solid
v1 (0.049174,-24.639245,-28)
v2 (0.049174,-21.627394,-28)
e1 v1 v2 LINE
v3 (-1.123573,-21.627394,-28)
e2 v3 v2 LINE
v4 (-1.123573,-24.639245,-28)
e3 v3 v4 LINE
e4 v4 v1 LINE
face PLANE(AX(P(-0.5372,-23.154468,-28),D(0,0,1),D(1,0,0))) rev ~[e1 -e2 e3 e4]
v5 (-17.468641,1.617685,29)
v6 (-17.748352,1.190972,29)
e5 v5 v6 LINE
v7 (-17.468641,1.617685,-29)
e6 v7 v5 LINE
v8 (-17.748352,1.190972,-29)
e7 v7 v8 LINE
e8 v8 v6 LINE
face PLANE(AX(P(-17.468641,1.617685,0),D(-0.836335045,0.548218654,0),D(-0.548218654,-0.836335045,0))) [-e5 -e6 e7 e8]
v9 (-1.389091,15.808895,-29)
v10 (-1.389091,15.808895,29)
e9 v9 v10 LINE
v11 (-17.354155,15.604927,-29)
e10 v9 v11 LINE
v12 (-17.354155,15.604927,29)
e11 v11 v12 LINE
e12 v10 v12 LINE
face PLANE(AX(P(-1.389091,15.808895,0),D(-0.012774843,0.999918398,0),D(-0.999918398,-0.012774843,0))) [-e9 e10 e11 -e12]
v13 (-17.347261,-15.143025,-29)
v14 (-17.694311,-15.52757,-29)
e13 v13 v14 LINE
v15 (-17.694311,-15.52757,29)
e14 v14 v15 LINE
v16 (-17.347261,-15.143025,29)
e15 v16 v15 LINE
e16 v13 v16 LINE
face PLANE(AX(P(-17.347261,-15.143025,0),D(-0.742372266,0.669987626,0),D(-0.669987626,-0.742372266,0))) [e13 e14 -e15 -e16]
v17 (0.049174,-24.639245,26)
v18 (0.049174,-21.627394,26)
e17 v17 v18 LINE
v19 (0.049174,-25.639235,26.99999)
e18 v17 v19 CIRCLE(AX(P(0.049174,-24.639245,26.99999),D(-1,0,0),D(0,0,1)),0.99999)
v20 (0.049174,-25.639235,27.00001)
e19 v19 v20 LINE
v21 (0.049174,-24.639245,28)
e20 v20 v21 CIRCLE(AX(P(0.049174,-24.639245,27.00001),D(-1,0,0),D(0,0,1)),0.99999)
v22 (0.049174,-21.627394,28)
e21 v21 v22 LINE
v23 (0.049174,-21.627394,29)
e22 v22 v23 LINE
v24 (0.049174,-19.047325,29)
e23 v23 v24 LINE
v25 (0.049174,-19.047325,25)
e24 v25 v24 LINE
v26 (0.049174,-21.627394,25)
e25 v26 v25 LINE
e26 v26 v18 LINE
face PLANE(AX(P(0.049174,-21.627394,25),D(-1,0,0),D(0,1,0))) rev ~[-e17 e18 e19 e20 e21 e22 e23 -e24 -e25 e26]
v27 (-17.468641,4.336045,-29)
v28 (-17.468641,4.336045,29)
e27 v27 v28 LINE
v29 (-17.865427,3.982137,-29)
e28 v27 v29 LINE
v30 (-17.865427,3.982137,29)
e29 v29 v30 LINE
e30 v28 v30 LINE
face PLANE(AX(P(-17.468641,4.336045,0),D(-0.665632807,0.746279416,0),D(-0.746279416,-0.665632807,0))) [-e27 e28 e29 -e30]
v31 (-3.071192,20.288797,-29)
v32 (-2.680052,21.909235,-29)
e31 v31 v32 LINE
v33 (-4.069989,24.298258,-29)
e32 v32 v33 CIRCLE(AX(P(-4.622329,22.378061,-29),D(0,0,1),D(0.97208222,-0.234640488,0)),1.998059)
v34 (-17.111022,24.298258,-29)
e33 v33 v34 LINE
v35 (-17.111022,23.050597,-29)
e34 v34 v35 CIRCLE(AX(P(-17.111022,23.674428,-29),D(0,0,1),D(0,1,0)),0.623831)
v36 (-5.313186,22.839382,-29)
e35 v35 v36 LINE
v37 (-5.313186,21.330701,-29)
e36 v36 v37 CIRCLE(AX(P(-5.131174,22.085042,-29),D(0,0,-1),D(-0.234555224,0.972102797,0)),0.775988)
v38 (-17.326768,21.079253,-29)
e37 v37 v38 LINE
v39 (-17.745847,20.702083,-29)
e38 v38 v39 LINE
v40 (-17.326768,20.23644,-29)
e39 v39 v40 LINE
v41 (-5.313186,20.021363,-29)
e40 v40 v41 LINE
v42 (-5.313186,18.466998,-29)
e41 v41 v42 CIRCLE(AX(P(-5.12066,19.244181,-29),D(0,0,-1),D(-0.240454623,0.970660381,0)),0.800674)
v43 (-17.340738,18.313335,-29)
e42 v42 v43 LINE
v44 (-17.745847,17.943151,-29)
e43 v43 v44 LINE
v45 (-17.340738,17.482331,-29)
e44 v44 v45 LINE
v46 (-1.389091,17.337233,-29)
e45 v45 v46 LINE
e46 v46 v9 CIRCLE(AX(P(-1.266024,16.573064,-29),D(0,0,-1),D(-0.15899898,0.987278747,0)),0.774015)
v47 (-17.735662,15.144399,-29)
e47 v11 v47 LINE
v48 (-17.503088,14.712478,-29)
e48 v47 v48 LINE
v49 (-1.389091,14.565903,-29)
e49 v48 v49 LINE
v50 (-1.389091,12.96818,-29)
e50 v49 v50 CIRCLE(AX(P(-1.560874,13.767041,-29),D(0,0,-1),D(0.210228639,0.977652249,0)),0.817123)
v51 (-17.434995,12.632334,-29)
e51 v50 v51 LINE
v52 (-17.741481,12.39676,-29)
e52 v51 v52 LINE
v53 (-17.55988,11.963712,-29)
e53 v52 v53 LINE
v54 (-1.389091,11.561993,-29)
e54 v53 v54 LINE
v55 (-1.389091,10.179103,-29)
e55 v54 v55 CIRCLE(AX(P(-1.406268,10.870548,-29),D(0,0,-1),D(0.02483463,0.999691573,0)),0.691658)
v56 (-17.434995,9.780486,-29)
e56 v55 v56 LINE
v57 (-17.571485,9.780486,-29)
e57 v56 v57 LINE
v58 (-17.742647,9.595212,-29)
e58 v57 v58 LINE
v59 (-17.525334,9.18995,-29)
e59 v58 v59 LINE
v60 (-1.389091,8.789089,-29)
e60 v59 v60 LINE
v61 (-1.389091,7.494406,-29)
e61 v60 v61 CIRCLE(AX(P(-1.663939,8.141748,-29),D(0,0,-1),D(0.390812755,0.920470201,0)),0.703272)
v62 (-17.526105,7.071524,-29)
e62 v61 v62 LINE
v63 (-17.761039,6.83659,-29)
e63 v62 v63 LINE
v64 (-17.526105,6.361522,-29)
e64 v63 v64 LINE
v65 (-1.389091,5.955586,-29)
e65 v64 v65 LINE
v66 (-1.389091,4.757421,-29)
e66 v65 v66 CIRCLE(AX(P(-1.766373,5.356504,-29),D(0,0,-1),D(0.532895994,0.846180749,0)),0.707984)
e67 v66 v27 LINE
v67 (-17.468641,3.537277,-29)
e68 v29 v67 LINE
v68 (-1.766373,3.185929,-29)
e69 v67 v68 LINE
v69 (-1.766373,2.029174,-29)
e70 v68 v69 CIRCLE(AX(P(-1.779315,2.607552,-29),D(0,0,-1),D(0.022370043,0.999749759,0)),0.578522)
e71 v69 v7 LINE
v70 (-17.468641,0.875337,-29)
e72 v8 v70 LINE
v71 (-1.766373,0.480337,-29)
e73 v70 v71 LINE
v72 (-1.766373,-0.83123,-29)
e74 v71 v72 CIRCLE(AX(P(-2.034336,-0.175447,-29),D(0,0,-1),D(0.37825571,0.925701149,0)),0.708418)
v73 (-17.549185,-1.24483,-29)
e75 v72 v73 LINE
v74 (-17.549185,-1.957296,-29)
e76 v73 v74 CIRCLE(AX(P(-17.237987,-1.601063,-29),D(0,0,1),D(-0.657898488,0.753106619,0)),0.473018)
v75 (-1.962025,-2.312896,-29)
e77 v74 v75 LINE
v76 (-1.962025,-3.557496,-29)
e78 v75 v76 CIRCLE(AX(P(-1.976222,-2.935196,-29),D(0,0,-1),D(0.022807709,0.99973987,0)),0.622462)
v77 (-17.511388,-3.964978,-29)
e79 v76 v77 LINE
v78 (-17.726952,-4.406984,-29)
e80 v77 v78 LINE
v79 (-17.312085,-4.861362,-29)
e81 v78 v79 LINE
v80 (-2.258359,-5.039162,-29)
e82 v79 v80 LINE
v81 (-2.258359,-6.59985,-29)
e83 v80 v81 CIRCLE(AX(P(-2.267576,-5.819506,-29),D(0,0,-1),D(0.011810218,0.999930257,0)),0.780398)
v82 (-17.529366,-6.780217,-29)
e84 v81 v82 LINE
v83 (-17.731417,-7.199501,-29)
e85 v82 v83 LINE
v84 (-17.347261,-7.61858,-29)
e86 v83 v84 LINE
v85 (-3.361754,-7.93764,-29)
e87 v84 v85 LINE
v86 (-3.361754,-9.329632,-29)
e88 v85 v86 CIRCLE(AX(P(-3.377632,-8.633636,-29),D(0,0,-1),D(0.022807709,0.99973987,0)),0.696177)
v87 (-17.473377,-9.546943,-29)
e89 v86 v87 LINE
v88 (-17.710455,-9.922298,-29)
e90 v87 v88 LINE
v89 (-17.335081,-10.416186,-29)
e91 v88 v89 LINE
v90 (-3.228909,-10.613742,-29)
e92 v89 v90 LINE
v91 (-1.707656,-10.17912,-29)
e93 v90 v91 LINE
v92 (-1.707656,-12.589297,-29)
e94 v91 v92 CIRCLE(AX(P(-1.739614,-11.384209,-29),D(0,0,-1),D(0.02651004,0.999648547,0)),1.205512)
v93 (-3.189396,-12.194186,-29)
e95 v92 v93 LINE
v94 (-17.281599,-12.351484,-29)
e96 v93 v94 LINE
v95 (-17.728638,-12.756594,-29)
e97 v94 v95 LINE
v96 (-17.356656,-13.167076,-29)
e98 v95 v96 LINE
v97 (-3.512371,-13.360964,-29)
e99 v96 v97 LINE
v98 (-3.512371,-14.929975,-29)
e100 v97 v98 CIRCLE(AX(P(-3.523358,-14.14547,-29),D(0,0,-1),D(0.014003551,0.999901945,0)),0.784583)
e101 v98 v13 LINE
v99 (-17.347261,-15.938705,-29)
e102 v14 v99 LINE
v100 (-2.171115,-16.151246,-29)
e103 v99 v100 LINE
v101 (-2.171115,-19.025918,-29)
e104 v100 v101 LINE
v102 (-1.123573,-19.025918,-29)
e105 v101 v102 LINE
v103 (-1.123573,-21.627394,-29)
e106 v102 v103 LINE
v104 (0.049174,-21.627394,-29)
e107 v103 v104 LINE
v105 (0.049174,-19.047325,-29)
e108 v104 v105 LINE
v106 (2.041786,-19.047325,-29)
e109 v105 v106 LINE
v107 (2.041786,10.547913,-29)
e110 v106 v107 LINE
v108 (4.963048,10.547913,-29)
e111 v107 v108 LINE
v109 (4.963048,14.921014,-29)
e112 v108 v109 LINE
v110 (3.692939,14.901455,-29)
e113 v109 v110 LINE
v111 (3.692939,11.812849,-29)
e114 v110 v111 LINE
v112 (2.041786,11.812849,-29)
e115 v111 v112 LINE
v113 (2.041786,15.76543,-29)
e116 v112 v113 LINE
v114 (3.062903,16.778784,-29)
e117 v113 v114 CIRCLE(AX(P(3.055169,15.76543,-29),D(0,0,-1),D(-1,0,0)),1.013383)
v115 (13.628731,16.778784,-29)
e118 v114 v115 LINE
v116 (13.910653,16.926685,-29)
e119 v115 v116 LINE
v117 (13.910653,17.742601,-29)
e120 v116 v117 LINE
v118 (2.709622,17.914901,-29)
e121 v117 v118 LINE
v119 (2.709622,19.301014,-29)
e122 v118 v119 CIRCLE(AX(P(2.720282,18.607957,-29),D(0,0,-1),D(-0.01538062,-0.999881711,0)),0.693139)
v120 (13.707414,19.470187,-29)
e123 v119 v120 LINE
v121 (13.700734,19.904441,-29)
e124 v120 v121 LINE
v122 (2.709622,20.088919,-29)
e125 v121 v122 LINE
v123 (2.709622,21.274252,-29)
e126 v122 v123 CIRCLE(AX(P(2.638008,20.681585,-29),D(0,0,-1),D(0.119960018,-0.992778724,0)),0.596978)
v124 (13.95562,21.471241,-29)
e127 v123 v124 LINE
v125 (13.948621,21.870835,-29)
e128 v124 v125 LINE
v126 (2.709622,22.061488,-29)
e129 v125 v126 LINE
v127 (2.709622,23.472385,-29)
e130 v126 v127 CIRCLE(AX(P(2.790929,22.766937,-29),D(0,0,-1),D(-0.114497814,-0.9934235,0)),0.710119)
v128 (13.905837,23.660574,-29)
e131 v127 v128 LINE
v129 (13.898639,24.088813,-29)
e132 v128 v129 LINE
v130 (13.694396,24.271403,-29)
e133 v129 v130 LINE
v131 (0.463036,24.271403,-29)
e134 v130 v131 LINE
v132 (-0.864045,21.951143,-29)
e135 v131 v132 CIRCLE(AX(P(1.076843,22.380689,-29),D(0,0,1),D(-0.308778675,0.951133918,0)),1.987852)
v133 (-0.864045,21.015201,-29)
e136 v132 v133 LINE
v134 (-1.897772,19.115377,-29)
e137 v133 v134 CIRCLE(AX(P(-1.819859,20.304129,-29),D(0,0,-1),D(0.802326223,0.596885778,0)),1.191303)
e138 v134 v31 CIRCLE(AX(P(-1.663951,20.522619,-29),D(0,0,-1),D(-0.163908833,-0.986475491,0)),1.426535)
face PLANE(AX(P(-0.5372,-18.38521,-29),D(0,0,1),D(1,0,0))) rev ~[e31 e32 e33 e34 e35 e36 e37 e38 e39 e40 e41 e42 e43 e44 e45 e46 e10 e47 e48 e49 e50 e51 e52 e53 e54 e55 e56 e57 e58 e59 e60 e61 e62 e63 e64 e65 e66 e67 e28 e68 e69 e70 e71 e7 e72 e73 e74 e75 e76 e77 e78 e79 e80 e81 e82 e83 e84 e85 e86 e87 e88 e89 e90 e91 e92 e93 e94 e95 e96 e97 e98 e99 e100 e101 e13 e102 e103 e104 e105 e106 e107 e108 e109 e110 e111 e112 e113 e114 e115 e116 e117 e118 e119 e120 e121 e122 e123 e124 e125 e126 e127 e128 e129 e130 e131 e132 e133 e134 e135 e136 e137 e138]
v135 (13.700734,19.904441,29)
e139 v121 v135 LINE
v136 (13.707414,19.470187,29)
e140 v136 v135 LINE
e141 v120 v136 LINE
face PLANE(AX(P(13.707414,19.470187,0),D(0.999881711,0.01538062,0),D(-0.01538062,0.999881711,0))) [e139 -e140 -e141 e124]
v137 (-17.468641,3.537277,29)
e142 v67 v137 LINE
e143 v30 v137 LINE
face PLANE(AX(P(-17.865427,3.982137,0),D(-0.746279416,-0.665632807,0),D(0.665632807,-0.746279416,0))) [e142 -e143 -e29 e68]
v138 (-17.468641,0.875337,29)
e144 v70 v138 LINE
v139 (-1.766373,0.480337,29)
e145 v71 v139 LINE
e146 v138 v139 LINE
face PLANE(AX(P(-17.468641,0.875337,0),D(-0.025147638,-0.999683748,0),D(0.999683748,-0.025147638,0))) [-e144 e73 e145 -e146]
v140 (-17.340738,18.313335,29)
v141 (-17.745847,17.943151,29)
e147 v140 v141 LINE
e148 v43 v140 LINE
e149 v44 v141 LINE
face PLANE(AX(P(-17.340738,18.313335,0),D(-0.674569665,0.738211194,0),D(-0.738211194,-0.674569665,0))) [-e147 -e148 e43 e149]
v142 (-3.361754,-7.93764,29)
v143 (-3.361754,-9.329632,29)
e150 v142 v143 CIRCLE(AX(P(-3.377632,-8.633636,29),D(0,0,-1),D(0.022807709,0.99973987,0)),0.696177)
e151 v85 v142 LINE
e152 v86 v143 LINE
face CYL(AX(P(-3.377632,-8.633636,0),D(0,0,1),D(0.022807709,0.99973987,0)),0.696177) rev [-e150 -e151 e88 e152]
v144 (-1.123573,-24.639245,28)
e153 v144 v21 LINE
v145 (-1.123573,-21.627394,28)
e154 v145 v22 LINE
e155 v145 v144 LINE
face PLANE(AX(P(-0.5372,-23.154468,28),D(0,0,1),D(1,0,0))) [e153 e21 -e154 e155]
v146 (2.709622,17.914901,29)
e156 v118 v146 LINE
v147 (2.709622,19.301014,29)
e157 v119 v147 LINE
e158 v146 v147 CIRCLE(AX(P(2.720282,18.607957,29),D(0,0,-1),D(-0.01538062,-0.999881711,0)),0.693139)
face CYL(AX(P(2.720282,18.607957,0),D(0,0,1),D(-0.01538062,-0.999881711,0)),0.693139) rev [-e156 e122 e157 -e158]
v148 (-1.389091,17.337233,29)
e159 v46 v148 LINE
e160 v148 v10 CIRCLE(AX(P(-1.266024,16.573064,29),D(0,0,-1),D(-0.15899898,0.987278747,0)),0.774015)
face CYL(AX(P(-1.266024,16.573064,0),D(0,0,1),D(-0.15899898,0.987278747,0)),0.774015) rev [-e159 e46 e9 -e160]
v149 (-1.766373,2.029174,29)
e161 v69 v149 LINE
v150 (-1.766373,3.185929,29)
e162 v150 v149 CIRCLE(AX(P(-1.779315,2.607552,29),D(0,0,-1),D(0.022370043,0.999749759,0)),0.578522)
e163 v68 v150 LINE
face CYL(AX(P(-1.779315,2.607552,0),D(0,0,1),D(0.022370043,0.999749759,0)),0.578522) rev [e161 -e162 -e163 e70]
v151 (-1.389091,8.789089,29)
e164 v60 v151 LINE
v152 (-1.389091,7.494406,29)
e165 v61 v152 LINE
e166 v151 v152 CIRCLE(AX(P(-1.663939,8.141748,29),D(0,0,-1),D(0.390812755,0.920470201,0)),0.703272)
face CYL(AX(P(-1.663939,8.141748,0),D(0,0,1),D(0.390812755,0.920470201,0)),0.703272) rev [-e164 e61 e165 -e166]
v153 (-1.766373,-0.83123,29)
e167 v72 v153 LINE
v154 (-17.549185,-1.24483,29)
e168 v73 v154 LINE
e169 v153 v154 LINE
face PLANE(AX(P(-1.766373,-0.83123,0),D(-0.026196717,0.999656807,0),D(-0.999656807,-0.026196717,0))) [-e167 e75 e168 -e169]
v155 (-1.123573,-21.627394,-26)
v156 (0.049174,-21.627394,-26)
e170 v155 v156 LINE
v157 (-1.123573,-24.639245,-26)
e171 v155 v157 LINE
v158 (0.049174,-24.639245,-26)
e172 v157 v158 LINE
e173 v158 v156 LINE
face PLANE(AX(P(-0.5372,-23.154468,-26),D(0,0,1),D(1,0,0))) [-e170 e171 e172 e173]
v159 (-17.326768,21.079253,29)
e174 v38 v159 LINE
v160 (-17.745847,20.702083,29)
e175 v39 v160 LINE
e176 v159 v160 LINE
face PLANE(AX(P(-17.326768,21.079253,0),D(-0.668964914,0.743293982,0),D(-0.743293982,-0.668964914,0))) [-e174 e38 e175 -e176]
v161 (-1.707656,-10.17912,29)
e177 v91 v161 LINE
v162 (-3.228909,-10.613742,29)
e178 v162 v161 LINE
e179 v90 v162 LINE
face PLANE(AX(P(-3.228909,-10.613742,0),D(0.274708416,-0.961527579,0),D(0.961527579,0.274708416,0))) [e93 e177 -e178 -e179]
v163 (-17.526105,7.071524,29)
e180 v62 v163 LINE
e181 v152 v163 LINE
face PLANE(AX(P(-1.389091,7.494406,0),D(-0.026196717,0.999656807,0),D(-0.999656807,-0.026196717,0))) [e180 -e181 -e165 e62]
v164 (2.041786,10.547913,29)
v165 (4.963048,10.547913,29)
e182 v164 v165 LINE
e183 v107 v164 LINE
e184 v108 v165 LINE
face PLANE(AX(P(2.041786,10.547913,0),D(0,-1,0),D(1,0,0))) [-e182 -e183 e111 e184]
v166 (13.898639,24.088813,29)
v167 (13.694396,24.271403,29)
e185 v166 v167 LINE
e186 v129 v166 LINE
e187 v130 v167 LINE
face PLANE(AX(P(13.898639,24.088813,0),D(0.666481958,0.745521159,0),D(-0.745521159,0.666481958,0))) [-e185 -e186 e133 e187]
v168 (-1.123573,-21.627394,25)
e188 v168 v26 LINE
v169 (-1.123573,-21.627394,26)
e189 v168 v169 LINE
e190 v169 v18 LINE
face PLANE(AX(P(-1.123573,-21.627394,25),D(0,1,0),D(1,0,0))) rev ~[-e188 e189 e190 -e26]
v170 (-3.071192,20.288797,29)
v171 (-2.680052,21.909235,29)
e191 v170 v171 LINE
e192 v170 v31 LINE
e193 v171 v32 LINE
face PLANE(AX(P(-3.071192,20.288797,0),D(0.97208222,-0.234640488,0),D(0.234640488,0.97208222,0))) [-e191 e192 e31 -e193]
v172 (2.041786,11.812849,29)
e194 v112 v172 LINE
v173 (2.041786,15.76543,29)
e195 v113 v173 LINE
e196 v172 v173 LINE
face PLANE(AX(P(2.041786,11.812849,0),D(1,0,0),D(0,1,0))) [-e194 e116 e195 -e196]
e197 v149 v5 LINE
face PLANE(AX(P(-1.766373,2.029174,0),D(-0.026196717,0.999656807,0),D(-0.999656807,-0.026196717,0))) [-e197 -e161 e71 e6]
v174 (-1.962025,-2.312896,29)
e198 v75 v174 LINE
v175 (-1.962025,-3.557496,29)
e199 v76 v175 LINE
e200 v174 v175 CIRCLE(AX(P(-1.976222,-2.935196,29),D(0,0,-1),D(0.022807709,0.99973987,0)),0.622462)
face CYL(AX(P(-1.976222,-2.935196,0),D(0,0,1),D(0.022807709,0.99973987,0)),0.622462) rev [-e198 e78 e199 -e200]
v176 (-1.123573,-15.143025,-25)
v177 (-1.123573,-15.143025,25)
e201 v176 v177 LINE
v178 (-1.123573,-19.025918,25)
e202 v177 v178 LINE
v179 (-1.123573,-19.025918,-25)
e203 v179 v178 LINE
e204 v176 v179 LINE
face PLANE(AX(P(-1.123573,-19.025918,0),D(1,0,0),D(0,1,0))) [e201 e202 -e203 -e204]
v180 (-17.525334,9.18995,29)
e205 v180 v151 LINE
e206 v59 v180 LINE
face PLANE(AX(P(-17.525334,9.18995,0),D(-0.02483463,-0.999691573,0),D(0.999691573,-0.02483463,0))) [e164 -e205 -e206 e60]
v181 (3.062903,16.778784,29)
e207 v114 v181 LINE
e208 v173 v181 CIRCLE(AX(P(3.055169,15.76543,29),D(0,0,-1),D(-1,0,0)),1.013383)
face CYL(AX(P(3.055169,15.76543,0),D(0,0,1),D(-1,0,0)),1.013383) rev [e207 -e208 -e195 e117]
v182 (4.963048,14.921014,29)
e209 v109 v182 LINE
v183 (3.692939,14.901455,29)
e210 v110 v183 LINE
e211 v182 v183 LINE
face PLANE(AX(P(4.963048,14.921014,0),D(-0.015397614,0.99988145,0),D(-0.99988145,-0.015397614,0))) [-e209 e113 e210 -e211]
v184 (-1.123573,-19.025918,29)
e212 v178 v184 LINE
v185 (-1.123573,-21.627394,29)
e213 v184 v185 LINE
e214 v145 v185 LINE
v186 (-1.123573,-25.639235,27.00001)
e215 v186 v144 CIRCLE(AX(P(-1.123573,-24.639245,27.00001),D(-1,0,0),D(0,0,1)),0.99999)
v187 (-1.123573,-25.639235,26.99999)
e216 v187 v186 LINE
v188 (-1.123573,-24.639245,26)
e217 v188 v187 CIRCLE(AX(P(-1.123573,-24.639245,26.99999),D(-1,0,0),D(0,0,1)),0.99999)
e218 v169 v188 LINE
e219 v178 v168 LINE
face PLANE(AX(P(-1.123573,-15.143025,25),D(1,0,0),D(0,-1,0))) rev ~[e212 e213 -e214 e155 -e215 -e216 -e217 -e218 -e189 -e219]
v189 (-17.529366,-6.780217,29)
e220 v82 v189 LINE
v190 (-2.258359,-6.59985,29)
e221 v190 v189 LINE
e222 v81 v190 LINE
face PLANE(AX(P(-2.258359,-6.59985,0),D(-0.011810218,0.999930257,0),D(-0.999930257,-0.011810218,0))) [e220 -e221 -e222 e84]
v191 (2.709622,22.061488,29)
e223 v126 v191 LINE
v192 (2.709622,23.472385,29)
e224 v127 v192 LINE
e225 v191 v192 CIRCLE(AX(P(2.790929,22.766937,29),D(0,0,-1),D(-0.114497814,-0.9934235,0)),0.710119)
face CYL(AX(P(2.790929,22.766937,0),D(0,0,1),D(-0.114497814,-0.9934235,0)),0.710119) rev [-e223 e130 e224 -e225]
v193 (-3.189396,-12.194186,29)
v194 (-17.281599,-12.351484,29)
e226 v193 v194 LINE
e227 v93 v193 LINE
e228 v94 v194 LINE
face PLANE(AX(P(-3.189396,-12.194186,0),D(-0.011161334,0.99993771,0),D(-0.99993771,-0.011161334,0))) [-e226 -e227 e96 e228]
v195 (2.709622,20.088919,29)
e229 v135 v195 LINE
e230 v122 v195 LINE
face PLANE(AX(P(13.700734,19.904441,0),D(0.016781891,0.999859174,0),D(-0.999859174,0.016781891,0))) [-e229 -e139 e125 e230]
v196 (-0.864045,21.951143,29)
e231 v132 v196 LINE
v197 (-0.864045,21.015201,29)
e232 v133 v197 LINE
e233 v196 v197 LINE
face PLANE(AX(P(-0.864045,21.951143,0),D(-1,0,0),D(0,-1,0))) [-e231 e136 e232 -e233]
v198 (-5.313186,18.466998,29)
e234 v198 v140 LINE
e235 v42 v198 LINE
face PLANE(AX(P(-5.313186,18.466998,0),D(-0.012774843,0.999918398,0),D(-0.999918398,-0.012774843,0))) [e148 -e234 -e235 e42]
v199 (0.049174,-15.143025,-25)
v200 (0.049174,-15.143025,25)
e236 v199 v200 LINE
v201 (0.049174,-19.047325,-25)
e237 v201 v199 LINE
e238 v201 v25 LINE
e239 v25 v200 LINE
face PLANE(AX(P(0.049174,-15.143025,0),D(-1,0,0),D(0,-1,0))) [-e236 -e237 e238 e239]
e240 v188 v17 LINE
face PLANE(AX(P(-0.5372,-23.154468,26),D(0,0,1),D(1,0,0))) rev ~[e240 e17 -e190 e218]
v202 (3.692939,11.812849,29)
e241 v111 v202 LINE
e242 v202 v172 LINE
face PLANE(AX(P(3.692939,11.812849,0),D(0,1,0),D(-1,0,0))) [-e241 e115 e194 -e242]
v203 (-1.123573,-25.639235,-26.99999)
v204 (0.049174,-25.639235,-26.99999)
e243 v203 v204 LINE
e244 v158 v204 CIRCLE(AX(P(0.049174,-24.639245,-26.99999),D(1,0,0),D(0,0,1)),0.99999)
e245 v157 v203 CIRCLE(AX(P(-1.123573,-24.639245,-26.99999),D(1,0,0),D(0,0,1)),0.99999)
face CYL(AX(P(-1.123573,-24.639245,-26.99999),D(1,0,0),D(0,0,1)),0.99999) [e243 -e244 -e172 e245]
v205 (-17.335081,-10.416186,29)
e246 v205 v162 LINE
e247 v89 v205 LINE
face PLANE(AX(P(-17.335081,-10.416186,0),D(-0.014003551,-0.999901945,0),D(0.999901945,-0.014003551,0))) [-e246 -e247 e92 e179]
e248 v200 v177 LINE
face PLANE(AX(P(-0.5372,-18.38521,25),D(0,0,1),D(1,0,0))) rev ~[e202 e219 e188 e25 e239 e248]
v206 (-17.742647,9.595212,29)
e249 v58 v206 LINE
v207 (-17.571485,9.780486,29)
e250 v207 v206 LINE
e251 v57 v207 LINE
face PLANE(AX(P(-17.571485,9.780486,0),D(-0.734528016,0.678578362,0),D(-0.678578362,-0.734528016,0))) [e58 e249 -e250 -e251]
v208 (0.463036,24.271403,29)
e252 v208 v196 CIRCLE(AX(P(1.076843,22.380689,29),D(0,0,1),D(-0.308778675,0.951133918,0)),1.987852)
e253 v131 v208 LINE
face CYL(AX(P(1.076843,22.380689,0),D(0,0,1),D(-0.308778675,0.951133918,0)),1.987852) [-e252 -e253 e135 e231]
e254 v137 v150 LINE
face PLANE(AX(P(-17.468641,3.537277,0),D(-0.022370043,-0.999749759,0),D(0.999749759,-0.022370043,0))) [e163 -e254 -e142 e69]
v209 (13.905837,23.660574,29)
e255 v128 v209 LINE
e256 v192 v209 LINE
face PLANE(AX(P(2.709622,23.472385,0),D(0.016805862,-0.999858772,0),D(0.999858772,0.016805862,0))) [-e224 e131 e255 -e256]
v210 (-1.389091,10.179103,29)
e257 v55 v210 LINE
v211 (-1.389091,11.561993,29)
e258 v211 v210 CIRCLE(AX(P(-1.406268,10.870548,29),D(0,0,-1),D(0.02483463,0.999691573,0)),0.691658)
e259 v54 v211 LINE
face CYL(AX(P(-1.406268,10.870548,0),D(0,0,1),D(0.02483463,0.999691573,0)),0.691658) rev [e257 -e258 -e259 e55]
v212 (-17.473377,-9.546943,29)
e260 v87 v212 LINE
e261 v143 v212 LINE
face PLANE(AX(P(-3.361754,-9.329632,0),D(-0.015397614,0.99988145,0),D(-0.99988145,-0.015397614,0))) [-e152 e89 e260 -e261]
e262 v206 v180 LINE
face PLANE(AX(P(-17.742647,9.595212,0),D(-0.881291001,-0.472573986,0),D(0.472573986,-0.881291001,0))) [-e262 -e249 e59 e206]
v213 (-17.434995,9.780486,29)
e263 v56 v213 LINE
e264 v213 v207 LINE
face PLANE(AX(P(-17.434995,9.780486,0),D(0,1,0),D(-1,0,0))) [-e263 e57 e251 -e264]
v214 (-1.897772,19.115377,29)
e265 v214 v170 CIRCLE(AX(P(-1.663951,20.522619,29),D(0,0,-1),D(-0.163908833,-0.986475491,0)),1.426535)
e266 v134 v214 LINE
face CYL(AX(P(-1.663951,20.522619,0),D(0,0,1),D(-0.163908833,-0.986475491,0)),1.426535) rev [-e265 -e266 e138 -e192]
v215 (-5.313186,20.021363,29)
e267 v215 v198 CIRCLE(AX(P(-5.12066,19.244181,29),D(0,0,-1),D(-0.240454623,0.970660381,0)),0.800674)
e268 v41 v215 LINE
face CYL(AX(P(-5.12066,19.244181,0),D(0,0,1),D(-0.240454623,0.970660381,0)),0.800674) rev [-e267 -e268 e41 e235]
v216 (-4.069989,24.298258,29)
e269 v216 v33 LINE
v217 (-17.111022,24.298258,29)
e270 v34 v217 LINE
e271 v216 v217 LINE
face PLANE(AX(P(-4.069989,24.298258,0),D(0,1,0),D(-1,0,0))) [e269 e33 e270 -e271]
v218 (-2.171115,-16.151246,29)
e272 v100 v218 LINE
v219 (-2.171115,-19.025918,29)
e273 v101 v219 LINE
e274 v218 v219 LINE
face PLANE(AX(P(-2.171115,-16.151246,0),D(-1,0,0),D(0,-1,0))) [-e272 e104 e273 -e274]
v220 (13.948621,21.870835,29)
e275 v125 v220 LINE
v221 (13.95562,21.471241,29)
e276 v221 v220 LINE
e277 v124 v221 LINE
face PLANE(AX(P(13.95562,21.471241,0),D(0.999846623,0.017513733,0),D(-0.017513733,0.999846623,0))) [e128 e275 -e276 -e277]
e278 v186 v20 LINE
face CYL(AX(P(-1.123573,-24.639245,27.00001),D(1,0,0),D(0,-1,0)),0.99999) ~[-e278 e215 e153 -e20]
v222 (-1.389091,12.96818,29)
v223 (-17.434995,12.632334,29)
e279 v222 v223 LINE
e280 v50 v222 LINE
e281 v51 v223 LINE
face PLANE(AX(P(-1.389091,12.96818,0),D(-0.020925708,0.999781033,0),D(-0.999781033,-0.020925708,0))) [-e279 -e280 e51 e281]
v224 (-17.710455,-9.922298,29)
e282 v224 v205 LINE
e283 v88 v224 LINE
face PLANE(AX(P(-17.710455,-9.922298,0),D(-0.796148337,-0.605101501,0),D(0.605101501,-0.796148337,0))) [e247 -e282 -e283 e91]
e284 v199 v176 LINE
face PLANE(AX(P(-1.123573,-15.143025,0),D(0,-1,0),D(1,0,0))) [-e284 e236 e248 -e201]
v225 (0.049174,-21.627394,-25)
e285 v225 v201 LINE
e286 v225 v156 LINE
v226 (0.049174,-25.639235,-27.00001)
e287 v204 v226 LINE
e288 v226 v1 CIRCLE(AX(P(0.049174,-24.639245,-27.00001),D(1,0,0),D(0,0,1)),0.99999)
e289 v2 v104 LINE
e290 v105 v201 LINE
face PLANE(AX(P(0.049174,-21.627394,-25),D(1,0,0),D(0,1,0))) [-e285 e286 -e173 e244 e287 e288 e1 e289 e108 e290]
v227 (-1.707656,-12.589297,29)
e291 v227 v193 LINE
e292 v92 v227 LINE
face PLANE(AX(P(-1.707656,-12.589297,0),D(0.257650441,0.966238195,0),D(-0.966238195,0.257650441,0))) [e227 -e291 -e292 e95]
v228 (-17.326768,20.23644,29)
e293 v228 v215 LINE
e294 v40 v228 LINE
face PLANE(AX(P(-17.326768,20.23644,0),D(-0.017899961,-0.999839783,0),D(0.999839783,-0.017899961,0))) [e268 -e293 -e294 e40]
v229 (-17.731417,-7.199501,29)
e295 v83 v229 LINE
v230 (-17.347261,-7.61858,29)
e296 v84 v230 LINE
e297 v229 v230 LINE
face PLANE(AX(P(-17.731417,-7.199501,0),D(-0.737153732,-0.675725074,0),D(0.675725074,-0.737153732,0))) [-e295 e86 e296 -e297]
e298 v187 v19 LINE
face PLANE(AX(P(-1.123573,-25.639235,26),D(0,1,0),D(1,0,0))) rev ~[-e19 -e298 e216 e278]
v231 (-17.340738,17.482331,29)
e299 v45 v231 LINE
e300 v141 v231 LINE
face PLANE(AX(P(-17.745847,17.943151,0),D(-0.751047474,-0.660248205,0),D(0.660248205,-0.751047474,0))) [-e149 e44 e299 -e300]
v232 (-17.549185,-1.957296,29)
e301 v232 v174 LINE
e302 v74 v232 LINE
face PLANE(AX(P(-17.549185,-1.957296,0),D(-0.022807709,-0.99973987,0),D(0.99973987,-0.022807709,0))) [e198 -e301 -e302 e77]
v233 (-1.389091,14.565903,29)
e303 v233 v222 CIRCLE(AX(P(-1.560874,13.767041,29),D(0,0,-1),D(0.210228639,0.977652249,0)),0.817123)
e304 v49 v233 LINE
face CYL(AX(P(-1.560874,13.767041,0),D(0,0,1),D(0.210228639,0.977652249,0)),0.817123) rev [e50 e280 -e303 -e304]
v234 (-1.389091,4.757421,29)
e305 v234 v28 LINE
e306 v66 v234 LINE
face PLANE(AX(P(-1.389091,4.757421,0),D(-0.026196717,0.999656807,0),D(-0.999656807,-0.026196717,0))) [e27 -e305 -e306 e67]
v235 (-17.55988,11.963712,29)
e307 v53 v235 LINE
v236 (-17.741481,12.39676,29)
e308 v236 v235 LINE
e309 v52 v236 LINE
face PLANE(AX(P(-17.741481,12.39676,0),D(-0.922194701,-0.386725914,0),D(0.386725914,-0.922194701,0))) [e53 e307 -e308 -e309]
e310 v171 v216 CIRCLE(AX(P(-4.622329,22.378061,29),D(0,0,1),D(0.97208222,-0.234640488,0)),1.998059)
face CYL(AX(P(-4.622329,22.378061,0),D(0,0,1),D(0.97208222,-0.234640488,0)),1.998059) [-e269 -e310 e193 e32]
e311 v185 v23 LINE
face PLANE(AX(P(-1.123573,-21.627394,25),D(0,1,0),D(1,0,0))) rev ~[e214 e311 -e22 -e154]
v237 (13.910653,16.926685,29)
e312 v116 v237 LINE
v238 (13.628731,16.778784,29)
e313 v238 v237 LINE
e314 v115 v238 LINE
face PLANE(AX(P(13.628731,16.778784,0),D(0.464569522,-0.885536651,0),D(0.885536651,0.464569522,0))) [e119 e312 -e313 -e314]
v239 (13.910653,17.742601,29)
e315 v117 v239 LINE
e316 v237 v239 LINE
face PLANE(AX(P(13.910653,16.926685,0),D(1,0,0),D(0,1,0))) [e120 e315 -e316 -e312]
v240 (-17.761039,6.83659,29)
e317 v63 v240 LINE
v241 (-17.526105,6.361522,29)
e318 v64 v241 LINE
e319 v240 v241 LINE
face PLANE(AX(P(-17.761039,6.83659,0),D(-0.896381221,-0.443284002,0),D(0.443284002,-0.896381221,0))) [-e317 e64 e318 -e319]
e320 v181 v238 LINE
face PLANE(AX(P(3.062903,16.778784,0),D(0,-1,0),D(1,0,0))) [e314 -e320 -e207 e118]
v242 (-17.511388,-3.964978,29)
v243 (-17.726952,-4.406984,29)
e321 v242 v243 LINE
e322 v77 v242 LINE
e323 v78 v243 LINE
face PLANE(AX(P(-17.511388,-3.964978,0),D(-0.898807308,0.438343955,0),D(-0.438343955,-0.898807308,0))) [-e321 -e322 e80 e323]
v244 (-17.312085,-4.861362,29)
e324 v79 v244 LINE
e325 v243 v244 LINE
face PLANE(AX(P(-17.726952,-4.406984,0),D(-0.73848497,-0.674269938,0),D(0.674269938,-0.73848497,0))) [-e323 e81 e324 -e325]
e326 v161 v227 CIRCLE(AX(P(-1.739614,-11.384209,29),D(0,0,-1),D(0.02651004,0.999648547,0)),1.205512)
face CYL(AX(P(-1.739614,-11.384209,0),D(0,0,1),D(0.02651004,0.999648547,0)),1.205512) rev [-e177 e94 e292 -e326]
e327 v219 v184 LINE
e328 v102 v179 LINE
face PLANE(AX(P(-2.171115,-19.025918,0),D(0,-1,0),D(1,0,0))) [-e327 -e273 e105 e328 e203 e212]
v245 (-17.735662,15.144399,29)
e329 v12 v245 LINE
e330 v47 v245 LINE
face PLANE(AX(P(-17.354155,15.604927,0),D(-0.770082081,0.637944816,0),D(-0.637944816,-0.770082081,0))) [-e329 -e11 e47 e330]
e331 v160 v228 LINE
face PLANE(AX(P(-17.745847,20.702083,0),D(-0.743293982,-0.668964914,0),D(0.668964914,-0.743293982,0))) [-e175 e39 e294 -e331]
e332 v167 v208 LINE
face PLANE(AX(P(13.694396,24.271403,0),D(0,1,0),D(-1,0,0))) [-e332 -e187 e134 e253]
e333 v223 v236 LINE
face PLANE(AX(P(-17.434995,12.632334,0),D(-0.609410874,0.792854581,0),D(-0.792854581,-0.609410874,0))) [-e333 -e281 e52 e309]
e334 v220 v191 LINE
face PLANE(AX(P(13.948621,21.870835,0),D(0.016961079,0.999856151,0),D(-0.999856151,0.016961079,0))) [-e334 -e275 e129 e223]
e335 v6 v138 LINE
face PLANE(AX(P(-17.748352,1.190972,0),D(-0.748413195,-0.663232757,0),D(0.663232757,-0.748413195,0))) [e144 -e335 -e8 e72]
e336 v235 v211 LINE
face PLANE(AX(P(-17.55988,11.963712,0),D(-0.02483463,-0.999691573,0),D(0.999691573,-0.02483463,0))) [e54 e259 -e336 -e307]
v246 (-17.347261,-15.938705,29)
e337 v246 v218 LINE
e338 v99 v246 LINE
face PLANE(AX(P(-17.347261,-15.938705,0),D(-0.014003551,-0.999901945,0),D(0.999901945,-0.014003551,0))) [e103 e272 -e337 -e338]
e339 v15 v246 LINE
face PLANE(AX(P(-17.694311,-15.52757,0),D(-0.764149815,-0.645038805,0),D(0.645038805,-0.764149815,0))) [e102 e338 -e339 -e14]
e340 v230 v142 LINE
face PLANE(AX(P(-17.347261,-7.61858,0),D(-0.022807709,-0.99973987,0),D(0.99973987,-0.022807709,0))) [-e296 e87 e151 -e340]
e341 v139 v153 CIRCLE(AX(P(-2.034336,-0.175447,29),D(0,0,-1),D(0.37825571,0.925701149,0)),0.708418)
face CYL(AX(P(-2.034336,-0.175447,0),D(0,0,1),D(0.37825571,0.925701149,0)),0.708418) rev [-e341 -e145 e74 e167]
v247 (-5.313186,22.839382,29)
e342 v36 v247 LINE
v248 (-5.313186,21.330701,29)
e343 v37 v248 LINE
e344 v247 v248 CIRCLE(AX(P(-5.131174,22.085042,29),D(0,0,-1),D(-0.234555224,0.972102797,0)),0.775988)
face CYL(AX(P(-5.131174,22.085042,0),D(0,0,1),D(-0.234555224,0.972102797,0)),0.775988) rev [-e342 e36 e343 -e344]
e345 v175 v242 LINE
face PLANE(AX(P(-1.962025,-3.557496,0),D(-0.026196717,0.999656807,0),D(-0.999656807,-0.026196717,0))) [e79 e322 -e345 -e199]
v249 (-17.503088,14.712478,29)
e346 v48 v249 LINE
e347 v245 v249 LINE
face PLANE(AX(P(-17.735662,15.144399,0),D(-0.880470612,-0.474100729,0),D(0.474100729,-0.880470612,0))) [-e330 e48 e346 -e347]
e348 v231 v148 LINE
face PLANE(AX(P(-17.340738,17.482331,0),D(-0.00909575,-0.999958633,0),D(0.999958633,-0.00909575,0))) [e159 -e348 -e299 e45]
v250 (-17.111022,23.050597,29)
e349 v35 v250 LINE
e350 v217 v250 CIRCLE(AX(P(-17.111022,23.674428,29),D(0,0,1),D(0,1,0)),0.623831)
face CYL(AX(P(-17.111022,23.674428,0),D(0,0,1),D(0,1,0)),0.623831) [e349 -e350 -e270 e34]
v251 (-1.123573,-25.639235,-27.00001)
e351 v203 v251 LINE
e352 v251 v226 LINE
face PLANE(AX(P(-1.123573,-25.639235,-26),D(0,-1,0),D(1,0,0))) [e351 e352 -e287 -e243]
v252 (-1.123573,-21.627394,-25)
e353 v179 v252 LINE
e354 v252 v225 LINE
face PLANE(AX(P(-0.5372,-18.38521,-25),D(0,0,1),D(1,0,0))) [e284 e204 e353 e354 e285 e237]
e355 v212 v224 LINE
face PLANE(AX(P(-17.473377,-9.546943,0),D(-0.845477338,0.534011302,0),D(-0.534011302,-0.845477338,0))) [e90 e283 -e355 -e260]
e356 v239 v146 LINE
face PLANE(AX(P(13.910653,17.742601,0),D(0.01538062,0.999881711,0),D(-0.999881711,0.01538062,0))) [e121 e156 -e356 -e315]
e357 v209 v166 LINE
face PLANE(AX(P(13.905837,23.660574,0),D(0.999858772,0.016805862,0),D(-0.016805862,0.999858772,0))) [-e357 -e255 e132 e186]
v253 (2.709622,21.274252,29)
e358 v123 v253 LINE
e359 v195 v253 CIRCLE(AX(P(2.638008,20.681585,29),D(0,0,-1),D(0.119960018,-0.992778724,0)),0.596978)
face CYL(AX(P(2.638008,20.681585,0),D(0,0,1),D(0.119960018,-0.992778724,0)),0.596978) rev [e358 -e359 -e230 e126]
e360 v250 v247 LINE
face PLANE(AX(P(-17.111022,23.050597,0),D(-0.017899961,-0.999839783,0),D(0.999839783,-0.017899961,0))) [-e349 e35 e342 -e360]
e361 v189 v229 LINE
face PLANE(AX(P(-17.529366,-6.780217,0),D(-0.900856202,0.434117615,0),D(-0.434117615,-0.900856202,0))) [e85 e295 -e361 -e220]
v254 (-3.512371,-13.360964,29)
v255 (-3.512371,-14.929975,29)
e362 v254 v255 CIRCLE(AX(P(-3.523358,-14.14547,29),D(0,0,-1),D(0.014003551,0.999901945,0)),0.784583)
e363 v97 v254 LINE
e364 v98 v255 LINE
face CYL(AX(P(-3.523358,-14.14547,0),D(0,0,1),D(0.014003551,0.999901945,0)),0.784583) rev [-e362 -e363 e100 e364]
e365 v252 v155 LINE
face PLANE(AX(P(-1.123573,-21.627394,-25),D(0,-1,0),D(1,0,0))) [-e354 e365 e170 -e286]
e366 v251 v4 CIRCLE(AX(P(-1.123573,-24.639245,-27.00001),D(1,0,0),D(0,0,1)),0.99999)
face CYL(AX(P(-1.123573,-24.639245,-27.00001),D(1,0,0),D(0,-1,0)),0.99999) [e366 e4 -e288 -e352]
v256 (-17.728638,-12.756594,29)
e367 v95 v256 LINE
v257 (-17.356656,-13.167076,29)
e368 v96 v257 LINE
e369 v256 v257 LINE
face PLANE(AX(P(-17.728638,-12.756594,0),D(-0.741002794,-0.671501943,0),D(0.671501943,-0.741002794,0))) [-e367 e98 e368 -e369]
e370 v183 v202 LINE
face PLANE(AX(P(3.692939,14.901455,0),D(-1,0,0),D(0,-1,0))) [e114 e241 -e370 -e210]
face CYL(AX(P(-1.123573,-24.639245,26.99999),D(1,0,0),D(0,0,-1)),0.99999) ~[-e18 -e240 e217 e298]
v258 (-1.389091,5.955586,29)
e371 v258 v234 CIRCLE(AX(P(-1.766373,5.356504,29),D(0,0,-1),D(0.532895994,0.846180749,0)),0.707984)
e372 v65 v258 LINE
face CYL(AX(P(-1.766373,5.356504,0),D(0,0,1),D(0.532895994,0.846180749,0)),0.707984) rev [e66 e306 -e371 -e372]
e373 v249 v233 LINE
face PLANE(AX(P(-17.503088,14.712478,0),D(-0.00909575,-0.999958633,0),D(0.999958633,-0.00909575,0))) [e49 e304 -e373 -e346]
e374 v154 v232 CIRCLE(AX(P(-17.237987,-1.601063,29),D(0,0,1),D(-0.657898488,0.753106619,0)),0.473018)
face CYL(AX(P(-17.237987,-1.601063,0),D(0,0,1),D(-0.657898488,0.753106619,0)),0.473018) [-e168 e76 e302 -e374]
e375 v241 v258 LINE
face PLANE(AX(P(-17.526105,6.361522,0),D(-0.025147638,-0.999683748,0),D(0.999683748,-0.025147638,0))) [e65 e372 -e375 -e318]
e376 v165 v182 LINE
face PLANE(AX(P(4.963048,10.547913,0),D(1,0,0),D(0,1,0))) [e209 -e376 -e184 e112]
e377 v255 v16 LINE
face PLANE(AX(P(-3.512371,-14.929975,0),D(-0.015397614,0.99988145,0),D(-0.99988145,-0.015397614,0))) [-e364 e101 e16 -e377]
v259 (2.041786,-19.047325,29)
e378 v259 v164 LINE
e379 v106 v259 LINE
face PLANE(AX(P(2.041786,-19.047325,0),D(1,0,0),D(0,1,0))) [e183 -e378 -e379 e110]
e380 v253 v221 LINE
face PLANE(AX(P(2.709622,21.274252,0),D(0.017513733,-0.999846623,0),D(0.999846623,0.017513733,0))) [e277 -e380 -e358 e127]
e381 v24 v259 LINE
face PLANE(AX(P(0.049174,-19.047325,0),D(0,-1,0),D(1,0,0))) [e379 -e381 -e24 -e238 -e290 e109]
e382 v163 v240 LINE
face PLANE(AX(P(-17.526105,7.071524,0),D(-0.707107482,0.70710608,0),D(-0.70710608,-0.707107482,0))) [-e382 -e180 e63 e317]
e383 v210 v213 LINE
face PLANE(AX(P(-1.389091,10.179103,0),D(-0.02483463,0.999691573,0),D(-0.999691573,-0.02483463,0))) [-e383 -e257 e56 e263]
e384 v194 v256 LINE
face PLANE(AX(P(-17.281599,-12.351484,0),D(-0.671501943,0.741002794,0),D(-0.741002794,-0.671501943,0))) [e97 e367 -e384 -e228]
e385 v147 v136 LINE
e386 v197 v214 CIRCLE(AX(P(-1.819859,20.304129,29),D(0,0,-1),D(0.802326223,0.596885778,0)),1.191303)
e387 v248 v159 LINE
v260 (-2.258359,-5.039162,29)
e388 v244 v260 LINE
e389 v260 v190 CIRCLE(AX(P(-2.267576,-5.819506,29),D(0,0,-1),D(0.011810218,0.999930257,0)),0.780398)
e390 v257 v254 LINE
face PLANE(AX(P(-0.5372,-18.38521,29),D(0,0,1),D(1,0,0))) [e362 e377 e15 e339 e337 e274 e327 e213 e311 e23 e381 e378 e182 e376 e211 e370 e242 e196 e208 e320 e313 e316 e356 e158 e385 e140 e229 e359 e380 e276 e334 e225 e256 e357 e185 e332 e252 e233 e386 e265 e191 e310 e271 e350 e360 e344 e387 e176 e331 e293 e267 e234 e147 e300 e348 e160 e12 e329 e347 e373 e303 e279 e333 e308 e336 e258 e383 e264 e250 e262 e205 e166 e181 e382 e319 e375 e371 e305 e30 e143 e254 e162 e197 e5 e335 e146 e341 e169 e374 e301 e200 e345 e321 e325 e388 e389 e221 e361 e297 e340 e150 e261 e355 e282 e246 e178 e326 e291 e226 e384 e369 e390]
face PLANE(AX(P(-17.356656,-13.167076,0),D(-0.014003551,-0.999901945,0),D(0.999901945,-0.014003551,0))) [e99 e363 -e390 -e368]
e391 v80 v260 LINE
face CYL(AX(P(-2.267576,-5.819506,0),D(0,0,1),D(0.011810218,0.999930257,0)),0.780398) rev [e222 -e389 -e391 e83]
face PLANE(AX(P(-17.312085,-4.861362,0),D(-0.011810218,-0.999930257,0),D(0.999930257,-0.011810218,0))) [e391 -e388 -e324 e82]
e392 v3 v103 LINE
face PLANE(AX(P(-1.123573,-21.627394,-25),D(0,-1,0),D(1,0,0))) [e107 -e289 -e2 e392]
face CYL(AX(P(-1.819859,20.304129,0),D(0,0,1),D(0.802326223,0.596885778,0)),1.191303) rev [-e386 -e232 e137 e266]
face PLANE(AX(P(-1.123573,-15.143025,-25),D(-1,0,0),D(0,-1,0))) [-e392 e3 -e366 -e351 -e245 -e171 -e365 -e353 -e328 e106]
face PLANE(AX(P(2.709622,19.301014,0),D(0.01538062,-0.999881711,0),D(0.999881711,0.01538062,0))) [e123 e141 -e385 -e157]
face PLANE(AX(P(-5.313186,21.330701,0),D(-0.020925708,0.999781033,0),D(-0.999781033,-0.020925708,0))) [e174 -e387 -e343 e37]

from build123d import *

# Parameters (mm, degrees)
F1_DEPTH = 29
F2_START = 25
F2_DEPTH = 4
F3_START = -25
F3_DEPTH = 4
F4_START = 26
F0_W     = 1.172746277
F0_H     = 3.0541475862
F0_H_2   = 0.957692816
F4_DEPTH = 2
F5_START = -26
F5_DEPTH = 2
F6_R     = 0.99999


# Not quite as in the source:
# - a fillet or chamfer is up to 0.001 mm smaller than in the source, because OpenCascade refuses the exact size


with BuildPart() as f1:
    # F0 (on Top) → F1 (new body, symmetric)
    with BuildSketch(Plane.XY):
        with BuildLine():
            Line((-4.0699890815, 24.2982581258), (-17.1110220253, 24.2982581258))
            ThreePointArc((-17.1110220253, 24.2982581258), (-17.7348526195, 23.6744275317), (-17.1110220253, 23.0505969375))
            Line((-17.1110220253, 23.0505969375), (-5.313185975, 22.8393822908))
            ThreePointArc((-5.313185975, 22.8393822908), (-4.3551853687, 22.085041739), (-5.313185975, 21.3307011873))
            Line((-5.313185975, 21.3307011873), (-17.3267684877, 21.0792534053))
            Line((-17.3267684877, 21.0792534053), (-17.7458468825, 20.7020826638))
            Line((-17.7458468825, 20.7020826638), (-17.3267684877, 20.2364402329))
            Line((-17.3267684877, 20.2364402329), (-5.313185975, 20.0213631141))
            ThreePointArc((-5.313185975, 20.0213631141), (-4.319986106, 19.2441805029), (-5.313185975, 18.4669978917))
            Line((-5.313185975, 18.4669978917), (-17.3407383263, 18.3133352548))
            Line((-17.3407383263, 18.3133352548), (-17.7458468825, 17.9431512952))
            Line((-17.7458468825, 17.9431512952), (-17.3407383263, 17.4823310226))
            Line((-17.3407383263, 17.4823310226), (-1.3890911359, 17.3372328281))
            ThreePointArc((-1.3890911359, 17.3372328281), (-0.492008259, 16.5730640292), (-1.3890911359, 15.8088952303))
            Line((-1.3890911359, 15.8088952303), (-17.3541552482, 15.6049273923))
            Line((-17.3541552482, 15.6049273923), (-17.7356619388, 15.1443993673))
            Line((-17.7356619388, 15.1443993673), (-17.5030883402, 14.7124780342))
            Line((-17.5030883402, 14.7124780342), (-1.3890911359, 14.5659030835))
            ThreePointArc((-1.3890911359, 14.5659030835), (-0.7437511811, 13.7670414267), (-1.3890911359, 12.9681797698))
            Line((-1.3890911359, 12.9681797698), (-17.4349947409, 12.6323343327))
            Line((-17.4349947409, 12.6323343327), (-17.7414808422, 12.3967602849))
            Line((-17.7414808422, 12.3967602849), (-17.5598803908, 11.9637120515))
            Line((-17.5598803908, 11.9637120515), (-1.3890911359, 11.5619925782))
            ThreePointArc((-1.3890911359, 11.5619925782), (-0.7146102661, 10.8705479652), (-1.3890911359, 10.1791033521))
            Line((-1.3890911359, 10.1791033521), (-17.4349947409, 9.7804863246))
            Line((-17.4349947409, 9.7804863246), (-17.57148467, 9.7804863246))
            Line((-17.57148467, 9.7804863246), (-17.7426468581, 9.5952115953))
            Line((-17.7426468581, 9.5952115953), (-17.5253339112, 9.1899503022))
            Line((-17.5253339112, 9.1899503022), (-1.3890911359, 8.7890890427))
            ThreePointArc((-1.3890911359, 8.7890890427), (-0.9606665076, 8.1417476758), (-1.3890911359, 7.494406309))
            Line((-1.3890911359, 7.494406309), (-17.5261050463, 7.0715243928))
            Line((-17.5261050463, 7.0715243928), (-17.7610386163, 6.8365903571))
            Line((-17.7610386163, 6.8365903571), (-17.5261050463, 6.3615223657))
            Line((-17.5261050463, 6.3615223657), (-1.3890911359, 5.9555862099))
            ThreePointArc((-1.3890911359, 5.9555862099), (-1.0583889027, 5.3565036505), (-1.3890911359, 4.7574210912))
            Line((-1.3890911359, 4.7574210912), (-17.4686410496, 4.3360450599))
            Line((-17.4686410496, 4.3360450599), (-17.8654273587, 3.982137423))
            Line((-17.8654273587, 3.982137423), (-17.4686410496, 3.5372773558))
            Line((-17.4686410496, 3.5372773558), (-1.7663730541, 3.1859290281))
            ThreePointArc((-1.7663730541, 3.1859290281), (-1.2007925503, 2.6075517307), (-1.7663730541, 2.0291744333))
            Line((-1.7663730541, 2.0291744333), (-17.4686410496, 1.6176853427))
            Line((-17.4686410496, 1.6176853427), (-17.7483521402, 1.1909720488))
            Line((-17.7483521402, 1.1909720488), (-17.4686410496, 0.8753370494))
            Line((-17.4686410496, 0.8753370494), (-1.7663730541, 0.4803371849))
            ThreePointArc((-1.7663730541, 0.4803371849), (-1.3259179646, -0.1754465338), (-1.7663730541, -0.8312302525))
            Line((-1.7663730541, -0.8312302525), (-17.5491847508, -1.244830048))
            ThreePointArc((-17.5491847508, -1.244830048), (-17.7110050083, -1.6010632209), (-17.5491847508, -1.9572963938))
            Line((-17.5491847508, -1.9572963938), (-1.9620249514, -2.3128963076))
            ThreePointArc((-1.9620249514, -2.3128963076), (-1.3537602225, -2.9351960402), (-1.9620249514, -3.5574957728))
            Line((-1.9620249514, -3.5574957728), (-17.5113877616, -3.9649778744))
            Line((-17.5113877616, -3.9649778744), (-17.7269522101, -4.4069844298))
            Line((-17.7269522101, -4.4069844298), (-17.312085256, -4.8613618128))
            Line((-17.312085256, -4.8613618128), (-2.2583589889, -5.0391620025))
            ThreePointArc((-2.2583589889, -5.0391620025), (-1.4871772278, -5.8195060119), (-2.2583589889, -6.5998500213))
            Line((-2.2583589889, -6.5998500213), (-17.5293660294, -6.7802165233))
            Line((-17.5293660294, -6.7802165233), (-17.7314169705, -7.1995011531))
            Line((-17.7314169705, -7.1995011531), (-17.3472613096, -7.6185795479))
            Line((-17.3472613096, -7.6185795479), (-3.3617539701, -7.9376399327))
            ThreePointArc((-3.3617539701, -7.9376399327), (-2.6814550827, -8.6336359286), (-3.3617539701, -9.3296319246))
            Line((-3.3617539701, -9.3296319246), (-17.4733772874, -9.5469430089))
            Line((-17.4733772874, -9.5469430089), (-17.710454762, -9.9222976714))
            Line((-17.710454762, -9.9222976714), (-17.335081473, -10.4161864147))
            Line((-17.335081473, -10.4161864147), (-3.228909336, -10.6137422845))
            Line((-3.228909336, -10.6137422845), (-1.7076556105, -10.1791201159))
            ThreePointArc((-1.7076556105, -10.1791201159), (-0.5341015375, -11.3842086866), (-1.7076556105, -12.5892972574))
            Line((-1.7076556105, -12.5892972574), (-3.189396346, -12.1941864491))
            Line((-3.189396346, -12.1941864491), (-17.2815993428, -12.3514840379))
            Line((-17.2815993428, -12.3514840379), (-17.7286379039, -12.7565935254))
            Line((-17.7286379039, -12.7565935254), (-17.3566557611, -13.1670760419))
            Line((-17.3566557611, -13.1670760419), (-3.5123708679, -13.3609642008))
            ThreePointArc((-3.5123708679, -13.3609642008), (-2.7387752862, -14.1454697919), (-3.5123708679, -14.929975383))
            Line((-3.5123708679, -14.929975383), (-17.3472613096, -15.1430249362))
            Line((-17.3472613096, -15.1430249362), (-17.6943112165, -15.5275696889))
            Line((-17.6943112165, -15.5275696889), (-17.3472613096, -15.9387048334))
            Line((-17.3472613096, -15.9387048334), (-2.1711152967, -16.1512456061))
            Line((-2.1711152967, -16.1512456061), (-2.1711152967, -19.0259180963))
            Line((-2.1711152967, -19.0259180963), (-1.1235726997, -19.0259180963))
            Line((-1.1235726997, -19.0259180963), (-1.1235726997, -15.1430249362))
            Line((-1.1235726997, -15.1430249362), (0.0491735773, -15.1430249362))
            Line((0.0491735773, -15.1430249362), (0.0491735773, -19.047325477))
            Line((0.0491735773, -19.047325477), (2.0417859778, -19.047325477))
            Line((2.0417859778, -19.047325477), (2.0417859778, 10.5479126796))
            Line((2.0417859778, 10.5479126796), (4.9630478024, 10.5479126796))
            Line((4.9630478024, 10.5479126796), (4.9630478024, 14.9210141972))
            Line((4.9630478024, 14.9210141972), (3.692939326, 14.901455239))
            Line((3.692939326, 14.901455239), (3.692939326, 11.8128489703))
            Line((3.692939326, 11.8128489703), (2.0417859778, 11.8128489703))
            Line((2.0417859778, 11.8128489703), (2.0417859778, 15.7654304057))
            ThreePointArc((2.0417859778, 15.7654304057), (2.3413387619, 16.4847297298), (3.0629034154, 16.7787838727))
            Line((3.0629034154, 16.7787838727), (13.6287314817, 16.7787838727))
            Line((13.6287314817, 16.7787838727), (13.9106530696, 16.9266853482))
            Line((13.9106530696, 16.9266853482), (13.9106530696, 17.7426013646))
            Line((13.9106530696, 17.7426013646), (2.7096215636, 17.9149005562))
            ThreePointArc((2.7096215636, 17.9149005562), (2.027143744, 18.6079572886), (2.7096215636, 19.301014021))
            Line((2.7096215636, 19.301014021), (13.7074142694, 19.4701869041))
            Line((13.7074142694, 19.4701869041), (13.7007343839, 19.9044408738))
            Line((13.7007343839, 19.9044408738), (2.7096215636, 20.0889185071))
            ThreePointArc((2.7096215636, 20.0889185071), (2.0410304994, 20.6815851852), (2.7096215636, 21.2742518634))
            Line((2.7096215636, 21.2742518634), (13.9556201175, 21.4712414891))
            Line((13.9556201175, 21.4712414891), (13.9486206756, 21.8708346796))
            Line((13.9486206756, 21.8708346796), (2.7096215636, 22.0614876598))
            ThreePointArc((2.7096215636, 22.0614876598), (2.0808096295, 22.7669365704), (2.7096215636, 23.472385481))
            Line((2.7096215636, 23.472385481), (13.9058372006, 23.6605741084))
            Line((13.9058372006, 23.6605741084), (13.8986392592, 24.088813075))
            Line((13.8986392592, 24.088813075), (13.6943962425, 24.271402508))
            Line((13.6943962425, 24.271402508), (0.4630363837, 24.271402508))
            ThreePointArc((0.4630363837, 24.271402508), (-0.6487056649, 23.3676230344), (-0.8640453452, 21.9511426985))
            Line((-0.8640453452, 21.9511426985), (-0.8640453452, 21.0152007639))
            ThreePointArc((-0.8640453452, 21.0152007639), (-0.7734316844, 19.7347502036), (-1.897772192, 19.1153772175))
            ThreePointArc((-1.897772192, 19.1153772175), (-2.6726628699, 19.513906378), (-3.0711919535, 20.2887970954))
            Line((-3.0711919535, 20.2887970954), (-2.680051839, 21.9092350453))
            ThreePointArc((-2.680051839, 21.9092350453), (-2.8952979424, 23.3828498722), (-4.0699890815, 24.2982581258))
        make_face()
    extrude(amount=F1_DEPTH, both=True)

    # F0 (on Top) → F2 (join)
    with BuildSketch(Plane.XY.offset(F2_START)):
        Polygon((0.0491735773, -21.6273944825), (0.0491735773, -19.047325477), (0.0491735773, -15.1430249362), (-1.1235726997, -15.1430249362), (-1.1235726997, -19.0259180963), (-1.1235726997, -21.6273944825), align=None)
    extrude(amount=F2_DEPTH)

    # F0 (on Top) → F3 (join)
    with BuildSketch(Plane.XY.offset(F3_START)):
        Polygon((0.0491735773, -21.6273944825), (0.0491735773, -19.047325477), (0.0491735773, -15.1430249362), (-1.1235726997, -15.1430249362), (-1.1235726997, -19.0259180963), (-1.1235726997, -21.6273944825), align=None)
    extrude(amount=-F3_DEPTH)

    # F0 (on Top) → F4 (join)
    with BuildSketch(Plane.XY.offset(F4_START)):
        with Locations((-0.5371995612, -23.1544682756)):
            Rectangle(F0_W, F0_H)
        with Locations((-0.5371995612, -25.1603884767)):
            Rectangle(F0_W, F0_H_2)
    extrude(amount=F4_DEPTH)

    # F0 (on Top) → F5 (join)
    with BuildSketch(Plane.XY.offset(F5_START)):
        with Locations((-0.5371995612, -23.1544682756)):
            Rectangle(F0_W, F0_H)
        with Locations((-0.5371995612, -25.1603884767)):
            Rectangle(F0_W, F0_H_2)
    extrude(amount=-F5_DEPTH)

    # F6 (radius 1 in the source; OpenCascade refuses exactly that, so slightly less here)
    f6_edges = [f1.edges().sort_by_distance(p)[0] for p in [
        (-0.5372, -25.639235, 28),
        (-0.5372, -25.639235, 26),
        (-0.5372, -25.639235, -26),
        (-0.5372, -25.639235, -28),
    ]]
    fillet(f6_edges, radius=F6_R)


solid = f1.part
